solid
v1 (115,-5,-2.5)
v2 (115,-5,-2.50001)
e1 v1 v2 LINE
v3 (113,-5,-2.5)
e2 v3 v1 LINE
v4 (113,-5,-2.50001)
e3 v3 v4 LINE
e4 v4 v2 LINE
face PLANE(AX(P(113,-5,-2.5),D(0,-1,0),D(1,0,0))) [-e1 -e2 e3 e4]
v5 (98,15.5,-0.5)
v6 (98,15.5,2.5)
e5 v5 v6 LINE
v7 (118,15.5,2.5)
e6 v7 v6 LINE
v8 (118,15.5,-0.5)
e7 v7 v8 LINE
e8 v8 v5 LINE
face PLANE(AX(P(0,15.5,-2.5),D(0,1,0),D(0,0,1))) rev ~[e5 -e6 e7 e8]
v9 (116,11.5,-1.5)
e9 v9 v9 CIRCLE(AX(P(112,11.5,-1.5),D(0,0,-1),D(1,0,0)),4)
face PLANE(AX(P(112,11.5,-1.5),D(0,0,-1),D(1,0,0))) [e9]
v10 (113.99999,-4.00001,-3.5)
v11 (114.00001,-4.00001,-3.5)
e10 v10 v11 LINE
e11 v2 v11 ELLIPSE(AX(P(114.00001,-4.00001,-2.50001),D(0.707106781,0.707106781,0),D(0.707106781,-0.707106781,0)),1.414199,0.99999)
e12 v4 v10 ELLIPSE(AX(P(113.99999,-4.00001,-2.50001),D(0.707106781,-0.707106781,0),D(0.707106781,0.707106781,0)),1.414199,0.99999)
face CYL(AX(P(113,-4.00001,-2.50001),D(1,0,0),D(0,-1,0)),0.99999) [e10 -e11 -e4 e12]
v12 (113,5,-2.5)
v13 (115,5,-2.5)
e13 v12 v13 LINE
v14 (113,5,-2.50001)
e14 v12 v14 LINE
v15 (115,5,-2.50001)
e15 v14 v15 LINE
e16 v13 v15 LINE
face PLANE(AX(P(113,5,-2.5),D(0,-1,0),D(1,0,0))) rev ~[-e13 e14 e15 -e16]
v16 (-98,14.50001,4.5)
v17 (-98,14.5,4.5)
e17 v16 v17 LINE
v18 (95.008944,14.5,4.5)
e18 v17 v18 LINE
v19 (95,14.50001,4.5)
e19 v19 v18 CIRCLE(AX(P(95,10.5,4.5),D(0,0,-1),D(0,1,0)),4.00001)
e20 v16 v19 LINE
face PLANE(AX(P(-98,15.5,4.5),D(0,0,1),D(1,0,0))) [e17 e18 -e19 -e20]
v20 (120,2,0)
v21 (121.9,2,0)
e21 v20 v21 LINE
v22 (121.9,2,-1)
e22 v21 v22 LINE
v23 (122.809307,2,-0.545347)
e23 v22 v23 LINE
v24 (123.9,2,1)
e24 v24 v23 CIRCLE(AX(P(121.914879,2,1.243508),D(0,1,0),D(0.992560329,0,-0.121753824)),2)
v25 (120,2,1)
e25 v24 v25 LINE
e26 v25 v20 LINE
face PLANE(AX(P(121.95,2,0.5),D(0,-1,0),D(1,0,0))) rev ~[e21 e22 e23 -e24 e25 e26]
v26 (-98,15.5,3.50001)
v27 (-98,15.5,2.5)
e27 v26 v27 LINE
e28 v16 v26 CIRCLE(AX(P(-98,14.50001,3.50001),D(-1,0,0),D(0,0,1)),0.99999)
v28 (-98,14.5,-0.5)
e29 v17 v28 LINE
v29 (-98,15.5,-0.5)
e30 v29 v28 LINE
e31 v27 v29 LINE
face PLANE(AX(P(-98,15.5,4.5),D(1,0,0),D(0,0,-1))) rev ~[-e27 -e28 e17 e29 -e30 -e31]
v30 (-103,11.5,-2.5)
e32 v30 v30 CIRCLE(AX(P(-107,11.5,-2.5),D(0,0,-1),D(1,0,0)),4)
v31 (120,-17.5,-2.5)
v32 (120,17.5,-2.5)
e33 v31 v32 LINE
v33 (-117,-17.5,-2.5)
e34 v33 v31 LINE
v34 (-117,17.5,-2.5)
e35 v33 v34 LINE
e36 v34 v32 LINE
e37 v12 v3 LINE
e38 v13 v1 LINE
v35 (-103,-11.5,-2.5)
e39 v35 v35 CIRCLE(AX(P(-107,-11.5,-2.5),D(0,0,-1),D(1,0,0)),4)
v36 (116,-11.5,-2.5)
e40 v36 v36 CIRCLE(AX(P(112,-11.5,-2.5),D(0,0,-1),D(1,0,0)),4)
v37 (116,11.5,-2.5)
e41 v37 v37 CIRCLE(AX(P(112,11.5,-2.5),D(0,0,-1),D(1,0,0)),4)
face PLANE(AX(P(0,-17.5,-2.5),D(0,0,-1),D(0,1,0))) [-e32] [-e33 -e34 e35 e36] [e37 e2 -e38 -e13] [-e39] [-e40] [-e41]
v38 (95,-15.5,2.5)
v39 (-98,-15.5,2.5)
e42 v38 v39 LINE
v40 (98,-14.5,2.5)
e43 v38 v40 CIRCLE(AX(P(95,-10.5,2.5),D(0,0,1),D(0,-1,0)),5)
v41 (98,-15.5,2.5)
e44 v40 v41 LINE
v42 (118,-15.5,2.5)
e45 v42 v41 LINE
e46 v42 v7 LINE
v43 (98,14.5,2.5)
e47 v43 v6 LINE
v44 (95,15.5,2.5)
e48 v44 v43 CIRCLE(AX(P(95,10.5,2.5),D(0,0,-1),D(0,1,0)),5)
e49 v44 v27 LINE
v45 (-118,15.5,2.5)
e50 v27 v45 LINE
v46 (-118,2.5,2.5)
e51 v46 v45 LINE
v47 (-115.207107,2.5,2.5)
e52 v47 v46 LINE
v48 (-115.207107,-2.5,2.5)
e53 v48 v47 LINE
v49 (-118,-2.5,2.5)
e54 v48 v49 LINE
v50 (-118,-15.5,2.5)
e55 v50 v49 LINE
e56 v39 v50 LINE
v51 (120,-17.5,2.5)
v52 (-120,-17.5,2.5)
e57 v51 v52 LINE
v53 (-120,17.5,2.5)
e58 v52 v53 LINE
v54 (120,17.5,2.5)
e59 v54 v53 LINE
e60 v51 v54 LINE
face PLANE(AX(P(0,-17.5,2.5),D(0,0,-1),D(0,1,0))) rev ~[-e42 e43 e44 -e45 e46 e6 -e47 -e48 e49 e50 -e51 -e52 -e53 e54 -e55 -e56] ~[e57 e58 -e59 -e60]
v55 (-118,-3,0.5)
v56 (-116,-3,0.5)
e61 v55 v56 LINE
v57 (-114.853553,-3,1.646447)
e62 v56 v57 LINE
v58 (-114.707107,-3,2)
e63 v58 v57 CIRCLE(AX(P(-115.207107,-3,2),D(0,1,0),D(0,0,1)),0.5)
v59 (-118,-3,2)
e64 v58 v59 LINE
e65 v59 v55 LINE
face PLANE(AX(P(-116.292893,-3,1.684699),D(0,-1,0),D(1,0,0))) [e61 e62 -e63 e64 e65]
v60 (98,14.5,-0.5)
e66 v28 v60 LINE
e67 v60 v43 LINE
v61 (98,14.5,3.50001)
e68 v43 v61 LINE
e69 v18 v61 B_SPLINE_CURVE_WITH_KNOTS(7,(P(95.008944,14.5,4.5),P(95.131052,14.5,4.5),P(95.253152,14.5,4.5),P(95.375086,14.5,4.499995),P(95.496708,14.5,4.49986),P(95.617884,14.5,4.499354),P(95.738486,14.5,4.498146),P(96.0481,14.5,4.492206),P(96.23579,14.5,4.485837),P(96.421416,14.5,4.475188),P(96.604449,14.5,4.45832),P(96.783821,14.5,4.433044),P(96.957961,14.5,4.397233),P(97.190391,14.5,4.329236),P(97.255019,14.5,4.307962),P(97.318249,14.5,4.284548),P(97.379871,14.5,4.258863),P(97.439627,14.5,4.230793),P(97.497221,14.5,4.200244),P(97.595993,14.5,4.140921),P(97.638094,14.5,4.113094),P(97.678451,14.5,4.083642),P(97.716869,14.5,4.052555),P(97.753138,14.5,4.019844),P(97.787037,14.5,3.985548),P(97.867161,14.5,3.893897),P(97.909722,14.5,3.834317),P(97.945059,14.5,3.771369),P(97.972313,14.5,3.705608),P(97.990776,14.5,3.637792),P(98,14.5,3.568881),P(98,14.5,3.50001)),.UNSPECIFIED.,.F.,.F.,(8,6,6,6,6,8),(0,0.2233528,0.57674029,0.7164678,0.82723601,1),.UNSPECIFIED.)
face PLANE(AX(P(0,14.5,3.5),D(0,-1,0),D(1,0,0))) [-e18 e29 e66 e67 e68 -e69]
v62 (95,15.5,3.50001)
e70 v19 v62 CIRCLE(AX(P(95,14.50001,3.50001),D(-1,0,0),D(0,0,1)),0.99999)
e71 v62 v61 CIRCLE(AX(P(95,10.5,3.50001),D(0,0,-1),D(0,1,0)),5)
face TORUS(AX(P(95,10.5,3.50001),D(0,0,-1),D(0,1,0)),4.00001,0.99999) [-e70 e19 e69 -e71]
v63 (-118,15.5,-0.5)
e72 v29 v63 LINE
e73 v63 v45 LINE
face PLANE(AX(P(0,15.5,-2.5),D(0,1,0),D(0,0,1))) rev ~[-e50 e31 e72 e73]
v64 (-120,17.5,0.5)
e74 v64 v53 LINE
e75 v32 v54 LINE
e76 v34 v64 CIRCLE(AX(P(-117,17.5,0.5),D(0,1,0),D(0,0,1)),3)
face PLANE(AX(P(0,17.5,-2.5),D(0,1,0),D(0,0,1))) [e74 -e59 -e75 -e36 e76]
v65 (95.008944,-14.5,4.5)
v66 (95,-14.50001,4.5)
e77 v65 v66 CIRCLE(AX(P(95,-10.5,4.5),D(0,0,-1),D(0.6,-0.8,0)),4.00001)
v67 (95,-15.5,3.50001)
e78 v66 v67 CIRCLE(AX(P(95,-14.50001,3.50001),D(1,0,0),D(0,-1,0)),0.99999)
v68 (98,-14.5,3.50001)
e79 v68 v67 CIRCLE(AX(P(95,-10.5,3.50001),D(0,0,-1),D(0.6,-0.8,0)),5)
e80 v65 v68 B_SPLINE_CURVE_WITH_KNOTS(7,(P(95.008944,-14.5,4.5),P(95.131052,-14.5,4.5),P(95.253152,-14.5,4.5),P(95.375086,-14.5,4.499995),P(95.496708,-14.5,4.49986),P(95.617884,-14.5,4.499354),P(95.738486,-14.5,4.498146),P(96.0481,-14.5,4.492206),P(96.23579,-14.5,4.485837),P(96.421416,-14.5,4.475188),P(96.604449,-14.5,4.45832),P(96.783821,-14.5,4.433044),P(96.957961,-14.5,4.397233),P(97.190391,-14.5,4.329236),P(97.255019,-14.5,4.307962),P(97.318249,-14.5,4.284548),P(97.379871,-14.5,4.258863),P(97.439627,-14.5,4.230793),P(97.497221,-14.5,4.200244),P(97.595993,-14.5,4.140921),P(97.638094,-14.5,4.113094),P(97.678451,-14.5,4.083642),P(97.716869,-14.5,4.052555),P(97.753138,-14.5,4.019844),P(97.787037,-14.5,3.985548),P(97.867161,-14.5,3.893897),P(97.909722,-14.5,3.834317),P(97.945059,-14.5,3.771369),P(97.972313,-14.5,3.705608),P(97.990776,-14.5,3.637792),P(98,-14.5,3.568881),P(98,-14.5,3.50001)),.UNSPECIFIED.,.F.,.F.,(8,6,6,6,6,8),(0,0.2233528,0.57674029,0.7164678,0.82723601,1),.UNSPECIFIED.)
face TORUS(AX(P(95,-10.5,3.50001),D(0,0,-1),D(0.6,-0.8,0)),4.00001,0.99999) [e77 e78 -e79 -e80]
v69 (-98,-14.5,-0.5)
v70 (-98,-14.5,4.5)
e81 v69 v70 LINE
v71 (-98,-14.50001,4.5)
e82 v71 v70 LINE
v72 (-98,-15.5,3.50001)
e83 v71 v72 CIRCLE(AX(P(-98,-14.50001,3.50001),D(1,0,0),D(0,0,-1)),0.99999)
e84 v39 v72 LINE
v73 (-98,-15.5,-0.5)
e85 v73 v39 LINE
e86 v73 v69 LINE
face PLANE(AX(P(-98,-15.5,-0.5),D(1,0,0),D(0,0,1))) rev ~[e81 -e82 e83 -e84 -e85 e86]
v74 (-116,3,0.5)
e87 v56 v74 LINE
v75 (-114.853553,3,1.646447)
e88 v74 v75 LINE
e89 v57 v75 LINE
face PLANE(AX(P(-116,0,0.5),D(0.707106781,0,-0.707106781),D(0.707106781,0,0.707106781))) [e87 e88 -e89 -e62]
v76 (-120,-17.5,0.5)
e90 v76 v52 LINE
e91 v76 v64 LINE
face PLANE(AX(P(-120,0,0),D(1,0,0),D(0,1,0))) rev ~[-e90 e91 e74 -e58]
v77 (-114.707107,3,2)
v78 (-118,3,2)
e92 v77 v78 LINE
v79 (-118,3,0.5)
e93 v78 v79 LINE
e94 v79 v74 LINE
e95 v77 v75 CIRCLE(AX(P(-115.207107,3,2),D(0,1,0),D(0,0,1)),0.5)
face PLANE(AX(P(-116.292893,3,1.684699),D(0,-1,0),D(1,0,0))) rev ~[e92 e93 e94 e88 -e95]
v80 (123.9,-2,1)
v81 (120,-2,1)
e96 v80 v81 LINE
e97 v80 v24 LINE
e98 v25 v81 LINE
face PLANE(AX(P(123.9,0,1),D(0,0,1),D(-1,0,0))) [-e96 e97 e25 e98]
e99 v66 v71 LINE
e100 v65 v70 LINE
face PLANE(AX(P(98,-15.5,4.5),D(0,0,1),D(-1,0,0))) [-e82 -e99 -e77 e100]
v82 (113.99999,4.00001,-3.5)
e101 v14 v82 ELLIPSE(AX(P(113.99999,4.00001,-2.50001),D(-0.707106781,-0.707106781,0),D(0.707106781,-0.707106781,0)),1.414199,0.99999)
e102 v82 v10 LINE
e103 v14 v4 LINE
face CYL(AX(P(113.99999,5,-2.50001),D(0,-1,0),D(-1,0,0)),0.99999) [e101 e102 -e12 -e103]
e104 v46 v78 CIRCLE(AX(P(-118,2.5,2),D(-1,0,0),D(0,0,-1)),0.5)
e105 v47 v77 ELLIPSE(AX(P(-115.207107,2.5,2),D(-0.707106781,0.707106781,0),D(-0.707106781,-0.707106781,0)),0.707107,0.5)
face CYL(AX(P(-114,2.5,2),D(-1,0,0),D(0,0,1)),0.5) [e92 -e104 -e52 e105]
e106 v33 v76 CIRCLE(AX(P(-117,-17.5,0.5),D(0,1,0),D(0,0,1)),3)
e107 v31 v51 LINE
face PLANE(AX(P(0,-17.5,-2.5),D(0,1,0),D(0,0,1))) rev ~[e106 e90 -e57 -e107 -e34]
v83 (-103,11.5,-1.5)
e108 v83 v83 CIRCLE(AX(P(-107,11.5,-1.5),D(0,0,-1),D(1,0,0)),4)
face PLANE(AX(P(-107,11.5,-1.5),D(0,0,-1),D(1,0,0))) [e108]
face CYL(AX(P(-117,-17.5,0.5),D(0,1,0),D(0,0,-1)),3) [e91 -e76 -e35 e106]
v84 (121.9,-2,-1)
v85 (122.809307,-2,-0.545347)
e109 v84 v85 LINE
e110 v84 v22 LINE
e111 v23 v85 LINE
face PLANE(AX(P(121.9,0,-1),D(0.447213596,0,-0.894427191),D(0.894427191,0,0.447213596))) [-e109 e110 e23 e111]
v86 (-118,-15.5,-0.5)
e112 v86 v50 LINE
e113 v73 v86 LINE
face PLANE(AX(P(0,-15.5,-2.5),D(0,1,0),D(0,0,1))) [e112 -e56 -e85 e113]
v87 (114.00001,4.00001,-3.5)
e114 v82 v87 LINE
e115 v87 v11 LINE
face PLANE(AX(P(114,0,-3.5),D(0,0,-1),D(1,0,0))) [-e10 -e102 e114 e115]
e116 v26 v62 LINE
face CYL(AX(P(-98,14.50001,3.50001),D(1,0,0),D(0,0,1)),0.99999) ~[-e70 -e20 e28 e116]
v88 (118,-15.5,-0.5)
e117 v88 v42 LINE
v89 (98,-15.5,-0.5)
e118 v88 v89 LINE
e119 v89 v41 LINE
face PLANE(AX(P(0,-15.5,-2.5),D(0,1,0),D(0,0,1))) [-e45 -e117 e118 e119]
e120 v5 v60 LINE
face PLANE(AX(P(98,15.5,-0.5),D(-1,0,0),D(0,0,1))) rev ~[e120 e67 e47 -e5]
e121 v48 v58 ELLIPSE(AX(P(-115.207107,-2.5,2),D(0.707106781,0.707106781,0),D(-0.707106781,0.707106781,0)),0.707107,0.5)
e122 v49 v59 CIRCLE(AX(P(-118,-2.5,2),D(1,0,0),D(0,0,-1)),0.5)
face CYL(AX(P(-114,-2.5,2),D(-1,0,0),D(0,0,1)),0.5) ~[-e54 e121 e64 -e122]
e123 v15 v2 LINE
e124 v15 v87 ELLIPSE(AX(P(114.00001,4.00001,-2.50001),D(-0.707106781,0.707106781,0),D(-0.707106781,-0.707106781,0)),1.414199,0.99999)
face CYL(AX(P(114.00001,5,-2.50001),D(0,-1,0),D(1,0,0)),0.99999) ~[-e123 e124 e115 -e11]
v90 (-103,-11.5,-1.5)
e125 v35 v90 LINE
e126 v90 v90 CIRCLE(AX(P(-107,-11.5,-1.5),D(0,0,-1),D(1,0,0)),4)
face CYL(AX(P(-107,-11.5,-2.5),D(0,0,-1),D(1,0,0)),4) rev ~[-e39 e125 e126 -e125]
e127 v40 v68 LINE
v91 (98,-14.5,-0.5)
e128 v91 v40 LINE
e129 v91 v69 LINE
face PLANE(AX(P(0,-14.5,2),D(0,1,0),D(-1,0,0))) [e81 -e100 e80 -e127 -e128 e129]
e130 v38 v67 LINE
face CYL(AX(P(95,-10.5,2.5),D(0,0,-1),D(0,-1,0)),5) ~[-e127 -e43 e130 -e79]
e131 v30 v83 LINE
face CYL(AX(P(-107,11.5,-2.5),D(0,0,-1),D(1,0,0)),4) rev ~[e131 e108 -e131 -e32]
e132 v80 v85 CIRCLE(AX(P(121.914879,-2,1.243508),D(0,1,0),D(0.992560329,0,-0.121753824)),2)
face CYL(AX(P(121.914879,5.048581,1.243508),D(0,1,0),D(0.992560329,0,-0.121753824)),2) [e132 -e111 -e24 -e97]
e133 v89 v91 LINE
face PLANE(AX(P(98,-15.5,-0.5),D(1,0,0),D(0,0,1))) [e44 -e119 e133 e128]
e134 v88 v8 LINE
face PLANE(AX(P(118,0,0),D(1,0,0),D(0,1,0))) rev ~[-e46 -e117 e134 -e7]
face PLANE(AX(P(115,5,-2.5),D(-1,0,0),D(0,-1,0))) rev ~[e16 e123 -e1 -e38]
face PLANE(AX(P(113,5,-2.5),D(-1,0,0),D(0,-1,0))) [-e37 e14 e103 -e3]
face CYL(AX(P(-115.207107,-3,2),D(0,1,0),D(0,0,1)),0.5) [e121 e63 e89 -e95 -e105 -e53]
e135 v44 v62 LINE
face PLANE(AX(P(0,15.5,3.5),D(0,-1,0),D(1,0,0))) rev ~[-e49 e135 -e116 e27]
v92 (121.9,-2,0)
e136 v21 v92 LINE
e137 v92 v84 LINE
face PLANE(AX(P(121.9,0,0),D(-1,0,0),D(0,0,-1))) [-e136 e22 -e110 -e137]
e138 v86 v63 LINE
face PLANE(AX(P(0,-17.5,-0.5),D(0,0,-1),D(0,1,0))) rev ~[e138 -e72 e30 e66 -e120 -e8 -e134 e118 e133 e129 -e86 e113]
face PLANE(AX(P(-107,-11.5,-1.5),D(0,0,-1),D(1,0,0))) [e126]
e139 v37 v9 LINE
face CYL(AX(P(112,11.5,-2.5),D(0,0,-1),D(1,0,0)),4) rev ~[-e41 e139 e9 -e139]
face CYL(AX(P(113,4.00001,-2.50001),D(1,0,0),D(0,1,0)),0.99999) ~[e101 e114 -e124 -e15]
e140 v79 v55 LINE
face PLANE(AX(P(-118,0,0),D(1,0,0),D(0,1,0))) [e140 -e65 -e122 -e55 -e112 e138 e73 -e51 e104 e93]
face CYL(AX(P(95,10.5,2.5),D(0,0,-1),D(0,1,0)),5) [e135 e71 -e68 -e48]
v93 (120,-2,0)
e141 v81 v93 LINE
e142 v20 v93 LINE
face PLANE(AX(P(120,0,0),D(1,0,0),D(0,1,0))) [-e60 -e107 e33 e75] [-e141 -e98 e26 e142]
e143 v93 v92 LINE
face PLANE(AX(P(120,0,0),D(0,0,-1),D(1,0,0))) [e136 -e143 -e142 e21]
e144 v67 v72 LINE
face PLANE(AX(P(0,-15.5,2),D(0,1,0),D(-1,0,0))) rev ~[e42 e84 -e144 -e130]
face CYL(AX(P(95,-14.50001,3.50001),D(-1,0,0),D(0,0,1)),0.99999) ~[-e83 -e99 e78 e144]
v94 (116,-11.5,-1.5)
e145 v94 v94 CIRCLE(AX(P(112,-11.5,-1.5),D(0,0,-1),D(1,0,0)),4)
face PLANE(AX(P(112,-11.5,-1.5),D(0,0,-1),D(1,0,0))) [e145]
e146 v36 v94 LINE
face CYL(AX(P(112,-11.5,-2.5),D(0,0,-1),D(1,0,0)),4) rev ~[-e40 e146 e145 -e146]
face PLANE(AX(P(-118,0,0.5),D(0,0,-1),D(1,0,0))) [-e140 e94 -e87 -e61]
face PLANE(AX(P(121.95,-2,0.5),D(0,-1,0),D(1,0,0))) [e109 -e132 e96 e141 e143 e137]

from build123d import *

# Parameters (mm, degrees)
F0_W         = 35
F0_H         = 5
F1_DEPTH     = 120
F2_T         = -2
F4_DEPTH     = 3
F6_DEPTH     = 2
F7_T1_DEPTH  = 10.0971618345
F8_W         = 196
F8_H         = 5
F9_DEPTH     = 1
F10_W        = 196
F10_H        = 2
F10_H_2      = 3
F11_DEPTH    = 1
F12_T1_DEPTH = 9.5
F13_R        = 0.99999
F14_R        = 0.5
F15_R        = 4
F16_DEPTH    = 1
F17_W        = 2
F17_H        = 10
F18_DEPTH    = 1
F19_R        = 0.99999
F20_R        = 3


# Not quite as in the source:
# - a fillet or chamfer that OpenCascade refuses, or shapes differently, is made with other operations: its cross-section is extruded or revolved along the edge and cut away or added
# - a fillet or chamfer is up to 0.001 mm smaller than in the source, because OpenCascade refuses the exact size


with BuildPart() as f1:
    # F0 (on Right) → F1 (new body, symmetric)
    with BuildSketch(Plane.YZ):
        Rectangle(F0_W, F0_H)
    extrude(amount=F1_DEPTH, both=True)

    # F2
    f2_openings = [f1.faces().sort_by_distance(p)[0] for p in [
        (0, 0, 2.5),
    ]]
    offset(amount=F2_T, openings=f2_openings)

    # F3 (on Front) → F4 (join, symmetric)
    with BuildSketch(Plane.XZ):
        Polygon((-114, 2.5), (-118, 2.5), (-118, 0.5), (-116, 0.5), align=None)
    extrude(amount=F4_DEPTH, both=True)

    # F5 (on Front) → F6 (join, symmetric)
    with BuildSketch(Plane.XZ):
        Polygon((123.9, 1), (120, 1), (120, 0), (121.9, 0), (123.9, 0), align=None)
        Polygon((121.9, -1), (123.9, 0), (121.9, 0), align=None)
    extrude(amount=F6_DEPTH, both=True)

    # F7: fillet of radius 2 on 1 edges, made by hand

    # F7_s2 → F7_t1 (cut)
    with BuildSketch(Plane.XZ.offset(-5.0485809173)):
        with BuildLine():
            ThreePointArc((123.9, 1), (123.5488845703, 0.09023972), (122.8093065335, -0.5453467333))
            Line((122.8093065335, -0.5453467333), (123.9, 0))
            Line((123.9, 0), (123.9, 1))
        make_face()
    extrude(amount=F7_T1_DEPTH, mode=Mode.SUBTRACT)

    # F8 (on face) → F9 (join)
    with BuildSketch(Plane(origin=(0, -15.5, 0), x_dir=(-1, 0, 0), z_dir=(0, 1, 0))):
        with Locations((0, 2)):
            Rectangle(F8_W, F8_H)
    extrude(amount=F9_DEPTH)

    # F10 (on face) → F11 (join)
    with BuildSketch(Plane.XZ.offset(-15.5)):
        with Locations((0, 3.5)):
            Rectangle(F10_W, F10_H)
        with Locations((0, 1)):
            Rectangle(F10_W, F10_H_2)
    extrude(amount=F11_DEPTH)

    # F12: fillet of radius 5 on 2 edges, made by hand

    # F12_s2 → F12_t1 (cut)
    with BuildSketch(Plane.XY.offset(2.5)):
        with BuildLine():
            ThreePointArc((95, 15.5), (96.5811388301, 15.2434164903), (98, 14.5))
            Line((98, 14.5), (98, 15.5))
            Line((98, 15.5), (95, 15.5))
        make_face()
        with BuildLine():
            ThreePointArc((95, -15.5), (96.5811388301, -15.2434164903), (98, -14.5))
            Line((98, -14.5), (98, -15.5))
            Line((98, -15.5), (95, -15.5))
        make_face()
    extrude(amount=F12_T1_DEPTH, mode=Mode.SUBTRACT)

    # F13 (radius 1 in the source; OpenCascade refuses exactly that, so slightly less here)
    f13_edges = [f1.edges().sort_by_distance(p)[0] for p in [
        (-1.5, -15.5, 4.5),
        (-1.5, 15.5, 4.5),
    ]]
    fillet(f13_edges, radius=F13_R)

    # F14
    f14_edges = [f1.edges().sort_by_distance(p)[0] for p in [
        (-114, 0, 2.5),
        (-116, -3, 2.5),
        (-116, 3, 2.5),
    ]]
    fillet(f14_edges, radius=F14_R)

    # F15 (on face) → F16 (cut)
    with BuildSketch(Plane(origin=(0, 0, -2.5), x_dir=(1, 0, 0), z_dir=(0, 0, -1))):
        with Locations((-107, 11.5)):
            Circle(F15_R)
        with Locations((-107, -11.5)):
            Circle(F15_R)
        with Locations((112, -11.5)):
            Circle(F15_R)
        with Locations((112, 11.5)):
            Circle(F15_R)
    extrude(amount=-F16_DEPTH, mode=Mode.SUBTRACT)

    # F17 (on face) → F18 (join)
    with BuildSketch(Plane(origin=(0, 0, -2.5), x_dir=(1, 0, 0), z_dir=(0, 0, -1))):
        with Locations((114, 0)):
            Rectangle(F17_W, F17_H)
    extrude(amount=F18_DEPTH)

    # F19 (radius 1 in the source; OpenCascade refuses exactly that, so slightly less here)
    f19_edges = [f1.edges().sort_by_distance(p)[0] for p in [
        (114, -5, -3.5),
        (115, 0, -3.5),
        (114, 5, -3.5),
        (113, 0, -3.5),
    ]]
    fillet(f19_edges, radius=F19_R)

    # F20
    f20_edges = [f1.edges().sort_by_distance(p)[0] for p in [
        (-120, 0, -2.5),
    ]]
    fillet(f20_edges, radius=F20_R)


solid = f1.part
